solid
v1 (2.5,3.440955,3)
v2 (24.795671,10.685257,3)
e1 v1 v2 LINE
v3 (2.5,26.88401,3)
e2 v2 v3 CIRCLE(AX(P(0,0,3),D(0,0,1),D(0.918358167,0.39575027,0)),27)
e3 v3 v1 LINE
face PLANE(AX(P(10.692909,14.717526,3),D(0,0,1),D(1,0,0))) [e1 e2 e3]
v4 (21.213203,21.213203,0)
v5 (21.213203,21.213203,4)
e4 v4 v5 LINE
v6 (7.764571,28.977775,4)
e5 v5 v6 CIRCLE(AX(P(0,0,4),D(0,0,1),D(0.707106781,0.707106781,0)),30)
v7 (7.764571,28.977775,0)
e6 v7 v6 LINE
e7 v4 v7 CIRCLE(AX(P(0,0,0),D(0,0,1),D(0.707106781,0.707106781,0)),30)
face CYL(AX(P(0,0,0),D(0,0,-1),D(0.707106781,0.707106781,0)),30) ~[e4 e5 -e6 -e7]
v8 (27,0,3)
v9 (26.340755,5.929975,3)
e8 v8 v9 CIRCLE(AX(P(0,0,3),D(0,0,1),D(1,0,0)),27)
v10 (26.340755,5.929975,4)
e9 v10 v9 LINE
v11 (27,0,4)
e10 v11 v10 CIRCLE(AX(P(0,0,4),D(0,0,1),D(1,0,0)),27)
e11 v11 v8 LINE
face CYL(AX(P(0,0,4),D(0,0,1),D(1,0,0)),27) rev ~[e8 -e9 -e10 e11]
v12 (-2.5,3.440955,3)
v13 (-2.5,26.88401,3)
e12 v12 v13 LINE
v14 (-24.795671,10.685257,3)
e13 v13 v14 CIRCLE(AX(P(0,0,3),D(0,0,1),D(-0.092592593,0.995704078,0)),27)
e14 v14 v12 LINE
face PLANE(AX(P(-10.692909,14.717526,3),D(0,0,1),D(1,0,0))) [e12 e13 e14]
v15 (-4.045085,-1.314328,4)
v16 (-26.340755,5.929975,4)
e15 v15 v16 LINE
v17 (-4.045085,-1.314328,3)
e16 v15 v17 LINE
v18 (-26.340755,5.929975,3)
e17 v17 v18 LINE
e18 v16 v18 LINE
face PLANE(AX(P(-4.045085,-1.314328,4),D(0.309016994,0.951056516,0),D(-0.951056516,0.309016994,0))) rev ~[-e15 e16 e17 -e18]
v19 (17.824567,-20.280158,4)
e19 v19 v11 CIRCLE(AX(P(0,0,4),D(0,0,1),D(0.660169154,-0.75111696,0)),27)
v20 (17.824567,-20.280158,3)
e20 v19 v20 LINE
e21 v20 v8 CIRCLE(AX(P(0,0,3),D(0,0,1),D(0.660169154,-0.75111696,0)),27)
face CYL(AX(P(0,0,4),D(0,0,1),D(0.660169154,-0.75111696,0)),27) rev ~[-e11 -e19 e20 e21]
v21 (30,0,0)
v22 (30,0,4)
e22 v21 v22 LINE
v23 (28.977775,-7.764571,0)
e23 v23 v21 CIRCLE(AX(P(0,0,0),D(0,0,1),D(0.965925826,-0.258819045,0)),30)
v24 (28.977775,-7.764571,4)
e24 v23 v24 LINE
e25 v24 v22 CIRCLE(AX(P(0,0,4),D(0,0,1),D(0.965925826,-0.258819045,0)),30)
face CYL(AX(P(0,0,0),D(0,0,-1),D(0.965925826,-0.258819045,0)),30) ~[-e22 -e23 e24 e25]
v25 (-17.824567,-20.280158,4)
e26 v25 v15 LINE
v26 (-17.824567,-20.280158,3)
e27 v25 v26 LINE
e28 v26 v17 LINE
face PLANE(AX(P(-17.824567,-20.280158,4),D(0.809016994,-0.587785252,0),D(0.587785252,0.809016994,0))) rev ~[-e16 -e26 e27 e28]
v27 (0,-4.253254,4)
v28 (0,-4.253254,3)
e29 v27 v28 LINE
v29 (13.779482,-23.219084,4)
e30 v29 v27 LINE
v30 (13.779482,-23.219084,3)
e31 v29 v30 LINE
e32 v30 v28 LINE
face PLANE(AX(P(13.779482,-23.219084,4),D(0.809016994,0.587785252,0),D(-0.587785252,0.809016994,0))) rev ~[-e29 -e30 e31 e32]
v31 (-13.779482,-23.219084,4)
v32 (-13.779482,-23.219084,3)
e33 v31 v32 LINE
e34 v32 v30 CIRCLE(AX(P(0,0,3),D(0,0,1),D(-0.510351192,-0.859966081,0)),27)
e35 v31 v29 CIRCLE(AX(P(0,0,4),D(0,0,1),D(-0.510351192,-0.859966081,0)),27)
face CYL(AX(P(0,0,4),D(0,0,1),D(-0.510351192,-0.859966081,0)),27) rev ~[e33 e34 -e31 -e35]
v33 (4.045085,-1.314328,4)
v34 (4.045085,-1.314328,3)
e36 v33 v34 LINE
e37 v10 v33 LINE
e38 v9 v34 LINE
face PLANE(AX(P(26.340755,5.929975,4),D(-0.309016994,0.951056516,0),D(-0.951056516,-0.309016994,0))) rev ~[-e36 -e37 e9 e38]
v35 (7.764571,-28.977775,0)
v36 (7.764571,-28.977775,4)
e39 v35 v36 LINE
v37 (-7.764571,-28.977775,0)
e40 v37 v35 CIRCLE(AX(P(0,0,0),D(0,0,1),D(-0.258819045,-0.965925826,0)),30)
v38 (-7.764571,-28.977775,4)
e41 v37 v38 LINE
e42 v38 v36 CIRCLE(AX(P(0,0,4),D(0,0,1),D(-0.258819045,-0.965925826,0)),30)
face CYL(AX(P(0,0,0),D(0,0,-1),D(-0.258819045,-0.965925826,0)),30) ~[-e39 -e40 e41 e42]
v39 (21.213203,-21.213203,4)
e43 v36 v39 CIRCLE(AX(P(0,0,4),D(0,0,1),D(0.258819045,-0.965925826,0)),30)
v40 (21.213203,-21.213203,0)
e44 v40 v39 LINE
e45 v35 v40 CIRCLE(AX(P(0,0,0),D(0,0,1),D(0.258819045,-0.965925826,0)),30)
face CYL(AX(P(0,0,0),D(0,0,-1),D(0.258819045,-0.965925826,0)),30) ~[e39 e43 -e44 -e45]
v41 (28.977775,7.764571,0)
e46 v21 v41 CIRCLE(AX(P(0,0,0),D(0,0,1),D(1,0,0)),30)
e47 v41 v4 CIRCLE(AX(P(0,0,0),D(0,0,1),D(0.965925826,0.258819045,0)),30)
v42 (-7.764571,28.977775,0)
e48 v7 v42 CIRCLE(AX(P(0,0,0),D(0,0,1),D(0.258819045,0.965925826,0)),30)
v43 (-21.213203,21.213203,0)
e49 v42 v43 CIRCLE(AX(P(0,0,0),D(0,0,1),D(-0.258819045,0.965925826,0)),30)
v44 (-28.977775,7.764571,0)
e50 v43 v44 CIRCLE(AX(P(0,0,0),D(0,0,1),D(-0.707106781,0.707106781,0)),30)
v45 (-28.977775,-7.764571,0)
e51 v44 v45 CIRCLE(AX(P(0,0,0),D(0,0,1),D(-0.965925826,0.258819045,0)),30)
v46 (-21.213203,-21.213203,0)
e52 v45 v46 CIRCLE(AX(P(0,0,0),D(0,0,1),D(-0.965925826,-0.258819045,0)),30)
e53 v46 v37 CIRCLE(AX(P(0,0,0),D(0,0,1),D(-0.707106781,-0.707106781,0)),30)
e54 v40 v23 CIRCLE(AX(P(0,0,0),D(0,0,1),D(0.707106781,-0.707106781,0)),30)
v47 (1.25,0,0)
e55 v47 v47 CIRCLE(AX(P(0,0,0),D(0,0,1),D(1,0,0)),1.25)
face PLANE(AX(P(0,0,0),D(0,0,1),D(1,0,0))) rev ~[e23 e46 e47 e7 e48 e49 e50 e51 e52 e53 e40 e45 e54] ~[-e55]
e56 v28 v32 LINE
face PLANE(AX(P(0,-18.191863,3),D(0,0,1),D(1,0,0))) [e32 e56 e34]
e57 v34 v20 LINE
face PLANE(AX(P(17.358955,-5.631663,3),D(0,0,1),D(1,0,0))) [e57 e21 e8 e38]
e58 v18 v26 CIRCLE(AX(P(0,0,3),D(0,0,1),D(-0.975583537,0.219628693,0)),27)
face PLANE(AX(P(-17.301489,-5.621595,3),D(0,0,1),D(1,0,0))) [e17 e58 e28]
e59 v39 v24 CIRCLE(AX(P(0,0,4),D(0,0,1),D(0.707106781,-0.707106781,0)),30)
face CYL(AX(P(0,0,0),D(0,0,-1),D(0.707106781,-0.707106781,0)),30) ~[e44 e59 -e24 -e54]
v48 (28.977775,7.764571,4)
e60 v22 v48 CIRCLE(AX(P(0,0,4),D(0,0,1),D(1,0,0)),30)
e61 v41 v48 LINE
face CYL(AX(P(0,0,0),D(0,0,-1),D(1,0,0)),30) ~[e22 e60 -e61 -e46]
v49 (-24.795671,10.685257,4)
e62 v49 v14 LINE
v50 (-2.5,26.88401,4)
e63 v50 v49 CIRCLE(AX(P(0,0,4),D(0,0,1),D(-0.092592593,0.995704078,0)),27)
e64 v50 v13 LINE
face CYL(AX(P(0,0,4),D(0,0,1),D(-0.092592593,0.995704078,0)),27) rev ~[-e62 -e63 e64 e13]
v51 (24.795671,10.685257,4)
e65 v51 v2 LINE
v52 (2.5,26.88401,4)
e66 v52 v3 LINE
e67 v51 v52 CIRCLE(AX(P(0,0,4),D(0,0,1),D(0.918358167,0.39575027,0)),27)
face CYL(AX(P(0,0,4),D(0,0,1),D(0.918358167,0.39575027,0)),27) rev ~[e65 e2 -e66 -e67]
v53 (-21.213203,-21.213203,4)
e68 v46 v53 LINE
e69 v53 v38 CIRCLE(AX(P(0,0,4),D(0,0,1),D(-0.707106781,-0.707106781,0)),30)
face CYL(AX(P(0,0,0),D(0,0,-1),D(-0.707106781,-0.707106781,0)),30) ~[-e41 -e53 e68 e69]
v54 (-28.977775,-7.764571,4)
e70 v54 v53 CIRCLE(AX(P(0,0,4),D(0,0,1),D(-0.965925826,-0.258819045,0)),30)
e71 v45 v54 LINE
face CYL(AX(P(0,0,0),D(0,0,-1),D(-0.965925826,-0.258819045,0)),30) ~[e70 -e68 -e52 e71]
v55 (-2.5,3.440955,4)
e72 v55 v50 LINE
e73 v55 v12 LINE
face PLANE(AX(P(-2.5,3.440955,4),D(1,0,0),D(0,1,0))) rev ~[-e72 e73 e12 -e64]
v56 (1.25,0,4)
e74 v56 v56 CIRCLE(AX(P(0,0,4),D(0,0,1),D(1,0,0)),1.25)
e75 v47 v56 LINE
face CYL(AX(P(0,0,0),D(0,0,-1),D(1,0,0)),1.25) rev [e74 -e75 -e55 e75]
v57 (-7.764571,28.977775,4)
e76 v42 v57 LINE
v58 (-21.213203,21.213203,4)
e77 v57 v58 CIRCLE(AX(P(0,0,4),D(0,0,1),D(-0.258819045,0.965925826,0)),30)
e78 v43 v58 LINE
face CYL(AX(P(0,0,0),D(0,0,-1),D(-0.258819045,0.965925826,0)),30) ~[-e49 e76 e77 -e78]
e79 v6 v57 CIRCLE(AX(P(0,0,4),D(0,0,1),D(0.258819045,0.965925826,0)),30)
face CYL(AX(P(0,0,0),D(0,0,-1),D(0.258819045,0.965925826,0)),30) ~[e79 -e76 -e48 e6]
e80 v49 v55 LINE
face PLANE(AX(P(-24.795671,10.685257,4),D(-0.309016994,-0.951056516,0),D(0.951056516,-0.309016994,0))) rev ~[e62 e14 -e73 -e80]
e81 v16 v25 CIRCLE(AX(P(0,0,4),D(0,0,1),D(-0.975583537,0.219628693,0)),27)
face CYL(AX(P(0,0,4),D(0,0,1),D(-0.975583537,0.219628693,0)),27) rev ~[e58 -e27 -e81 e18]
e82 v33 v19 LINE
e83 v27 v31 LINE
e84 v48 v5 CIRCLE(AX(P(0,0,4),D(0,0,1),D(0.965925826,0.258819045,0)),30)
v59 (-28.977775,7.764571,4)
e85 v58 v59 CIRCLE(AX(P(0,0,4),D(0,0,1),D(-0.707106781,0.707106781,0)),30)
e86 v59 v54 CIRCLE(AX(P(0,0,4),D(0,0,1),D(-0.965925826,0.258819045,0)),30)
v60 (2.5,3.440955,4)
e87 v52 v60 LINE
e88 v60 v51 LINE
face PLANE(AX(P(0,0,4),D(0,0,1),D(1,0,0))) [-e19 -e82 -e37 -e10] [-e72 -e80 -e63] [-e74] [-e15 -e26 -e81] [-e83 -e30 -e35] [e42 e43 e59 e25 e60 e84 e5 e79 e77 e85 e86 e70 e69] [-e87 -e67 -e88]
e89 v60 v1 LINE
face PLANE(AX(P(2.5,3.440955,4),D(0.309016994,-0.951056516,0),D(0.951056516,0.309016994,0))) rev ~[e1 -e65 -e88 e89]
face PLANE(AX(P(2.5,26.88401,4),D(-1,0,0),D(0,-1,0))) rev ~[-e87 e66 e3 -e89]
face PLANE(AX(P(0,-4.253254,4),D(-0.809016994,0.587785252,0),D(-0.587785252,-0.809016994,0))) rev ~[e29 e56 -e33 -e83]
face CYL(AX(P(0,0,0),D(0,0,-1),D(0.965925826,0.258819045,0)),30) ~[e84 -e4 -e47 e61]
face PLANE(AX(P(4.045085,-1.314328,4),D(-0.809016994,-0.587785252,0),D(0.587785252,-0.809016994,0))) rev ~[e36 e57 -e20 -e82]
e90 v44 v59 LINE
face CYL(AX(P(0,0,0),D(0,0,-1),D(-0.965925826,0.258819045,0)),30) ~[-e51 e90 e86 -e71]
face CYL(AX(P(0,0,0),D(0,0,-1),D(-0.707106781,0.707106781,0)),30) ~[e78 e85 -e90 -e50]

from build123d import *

# Parameters (mm, degrees)
F0_R     = 1.25
F1_DEPTH = 4
F3_DEPTH = 1


with BuildPart() as f1:
    # F0 (on Top) → F1 (new body)
    with BuildSketch(Plane.XY):
        Polygon((20, 0), (28.9777747887, 7.7645713531), (17.3205080757, 10), (21.2132034356, 21.2132034356), (10, 17.3205080757), (7.7645713531, 28.9777747887), (0, 20), (-7.7645713531, 28.9777747887), (-10, 17.3205080757), (-21.2132034356, 21.2132034356), (-17.3205080757, 10), (-28.9777747887, 7.7645713531), (-20, 0), (-28.9777747887, -7.7645713531), (-17.3205080757, -10), (-21.2132034356, -21.2132034356), (-10, -17.3205080757), (-7.7645713531, -28.9777747887), (0, -20), (7.7645713531, -28.9777747887), (10, -17.3205080757), (21.2132034356, -21.2132034356), (17.3205080757, -10), (28.9777747887, -7.7645713531), align=None)
        Circle(F0_R, mode=Mode.SUBTRACT)
        with BuildLine():
            Line((-20, 0), (-28.9777747887, 7.7645713531))
            ThreePointArc((-28.9777747887, 7.7645713531), (-30, 0), (-28.9777747887, -7.7645713531))
            Line((-28.9777747887, -7.7645713531), (-20, 0))
        make_face()
        with BuildLine():
            Line((-17.3205080757, 10), (-21.2132034356, 21.2132034356))
            ThreePointArc((-21.2132034356, 21.2132034356), (-25.9807621135, 15), (-28.9777747887, 7.7645713531))
            Line((-28.9777747887, 7.7645713531), (-17.3205080757, 10))
        make_face()
        with BuildLine():
            Line((-10, 17.3205080757), (-7.7645713531, 28.9777747887))
            ThreePointArc((-7.7645713531, 28.9777747887), (-15, 25.9807621135), (-21.2132034356, 21.2132034356))
            Line((-21.2132034356, 21.2132034356), (-10, 17.3205080757))
        make_face()
        with BuildLine():
            Line((0, 20), (7.7645713531, 28.9777747887))
            ThreePointArc((7.7645713531, 28.9777747887), (0, 30), (-7.7645713531, 28.9777747887))
            Line((-7.7645713531, 28.9777747887), (0, 20))
        make_face()
        with BuildLine():
            Line((10, 17.3205080757), (21.2132034356, 21.2132034356))
            ThreePointArc((21.2132034356, 21.2132034356), (15, 25.9807621135), (7.7645713531, 28.9777747887))
            Line((7.7645713531, 28.9777747887), (10, 17.3205080757))
        make_face()
        with BuildLine():
            Line((17.3205080757, 10), (28.9777747887, 7.7645713531))
            ThreePointArc((28.9777747887, 7.7645713531), (25.9807621135, 15), (21.2132034356, 21.2132034356))
            Line((21.2132034356, 21.2132034356), (17.3205080757, 10))
        make_face()
        with BuildLine():
            ThreePointArc((28.9777747887, -7.7645713531), (29.7433458412, -3.9157857666), (30, 0))
            ThreePointArc((30, 0), (29.7433458412, 3.9157857666), (28.9777747887, 7.7645713531))
            Line((28.9777747887, 7.7645713531), (20, 0))
            Line((20, 0), (28.9777747887, -7.7645713531))
        make_face()
        with BuildLine():
            ThreePointArc((21.2132034356, -21.2132034356), (25.9807621135, -15), (28.9777747887, -7.7645713531))
            Line((28.9777747887, -7.7645713531), (17.3205080757, -10))
            Line((17.3205080757, -10), (21.2132034356, -21.2132034356))
        make_face()
        with BuildLine():
            ThreePointArc((7.7645713531, -28.9777747887), (15, -25.9807621135), (21.2132034356, -21.2132034356))
            Line((21.2132034356, -21.2132034356), (10, -17.3205080757))
            Line((10, -17.3205080757), (7.7645713531, -28.9777747887))
        make_face()
        with BuildLine():
            ThreePointArc((-7.7645713531, -28.9777747887), (0, -30), (7.7645713531, -28.9777747887))
            Line((7.7645713531, -28.9777747887), (0, -20))
            Line((0, -20), (-7.7645713531, -28.9777747887))
        make_face()
        with BuildLine():
            ThreePointArc((-21.2132034356, -21.2132034356), (-15, -25.9807621135), (-7.7645713531, -28.9777747887))
            Line((-7.7645713531, -28.9777747887), (-10, -17.3205080757))
            Line((-10, -17.3205080757), (-21.2132034356, -21.2132034356))
        make_face()
        with BuildLine():
            ThreePointArc((-28.9777747887, -7.7645713531), (-25.9807621135, -15), (-21.2132034356, -21.2132034356))
            Line((-21.2132034356, -21.2132034356), (-17.3205080757, -10))
            Line((-17.3205080757, -10), (-28.9777747887, -7.7645713531))
        make_face()
    extrude(amount=F1_DEPTH)

    # F2 (on face) → F3 (cut)
    with BuildSketch(Plane.XY.offset(4)):
        with BuildLine():
            Line((-24.7956705205, 10.685257294), (-2.5, 3.4409548012))
            Line((-2.5, 3.4409548012), (-2.5, 26.8840101175))
            ThreePointArc((-2.5, 26.8840101175), (-15.8702018119, 21.8434588481), (-24.7956705205, 10.685257294))
        make_face()
        with BuildLine():
            Line((2.5, 26.8840101175), (2.5, 3.4409548012))
            Line((2.5, 3.4409548012), (24.7956705205, 10.685257294))
            ThreePointArc((24.7956705205, 10.685257294), (15.8702018119, 21.8434588481), (2.5, 26.8840101175))
        make_face()
        with BuildLine():
            Line((26.3407554924, 5.9299747125), (4.0450849719, -1.3143277803))
            Line((4.0450849719, -1.3143277803), (17.8245671555, -20.2801579313))
            ThreePointArc((17.8245671555, -20.2801579313), (24.5994239079, -11.1296155999), (27, 0))
            ThreePointArc((27, 0), (26.8346827659, 2.9832534007), (26.3407554924, 5.9299747125))
        make_face()
        with BuildLine():
            Line((13.7794821836, -23.2190841928), (0, -4.2532540418))
            Line((0, -4.2532540418), (-13.7794821836, -23.2190841928))
            ThreePointArc((-13.7794821836, -23.2190841928), (0, -27), (13.7794821836, -23.2190841928))
        make_face()
        with BuildLine():
            Line((-17.8245671555, -20.2801579313), (-4.0450849719, -1.3143277803))
            Line((-4.0450849719, -1.3143277803), (-26.3407554924, 5.9299747125))
            ThreePointArc((-26.3407554924, 5.9299747125), (-25.67852594, -8.3434588481), (-17.8245671555, -20.2801579313))
        make_face()
    extrude(amount=-F3_DEPTH, mode=Mode.SUBTRACT)


solid = f1.part
